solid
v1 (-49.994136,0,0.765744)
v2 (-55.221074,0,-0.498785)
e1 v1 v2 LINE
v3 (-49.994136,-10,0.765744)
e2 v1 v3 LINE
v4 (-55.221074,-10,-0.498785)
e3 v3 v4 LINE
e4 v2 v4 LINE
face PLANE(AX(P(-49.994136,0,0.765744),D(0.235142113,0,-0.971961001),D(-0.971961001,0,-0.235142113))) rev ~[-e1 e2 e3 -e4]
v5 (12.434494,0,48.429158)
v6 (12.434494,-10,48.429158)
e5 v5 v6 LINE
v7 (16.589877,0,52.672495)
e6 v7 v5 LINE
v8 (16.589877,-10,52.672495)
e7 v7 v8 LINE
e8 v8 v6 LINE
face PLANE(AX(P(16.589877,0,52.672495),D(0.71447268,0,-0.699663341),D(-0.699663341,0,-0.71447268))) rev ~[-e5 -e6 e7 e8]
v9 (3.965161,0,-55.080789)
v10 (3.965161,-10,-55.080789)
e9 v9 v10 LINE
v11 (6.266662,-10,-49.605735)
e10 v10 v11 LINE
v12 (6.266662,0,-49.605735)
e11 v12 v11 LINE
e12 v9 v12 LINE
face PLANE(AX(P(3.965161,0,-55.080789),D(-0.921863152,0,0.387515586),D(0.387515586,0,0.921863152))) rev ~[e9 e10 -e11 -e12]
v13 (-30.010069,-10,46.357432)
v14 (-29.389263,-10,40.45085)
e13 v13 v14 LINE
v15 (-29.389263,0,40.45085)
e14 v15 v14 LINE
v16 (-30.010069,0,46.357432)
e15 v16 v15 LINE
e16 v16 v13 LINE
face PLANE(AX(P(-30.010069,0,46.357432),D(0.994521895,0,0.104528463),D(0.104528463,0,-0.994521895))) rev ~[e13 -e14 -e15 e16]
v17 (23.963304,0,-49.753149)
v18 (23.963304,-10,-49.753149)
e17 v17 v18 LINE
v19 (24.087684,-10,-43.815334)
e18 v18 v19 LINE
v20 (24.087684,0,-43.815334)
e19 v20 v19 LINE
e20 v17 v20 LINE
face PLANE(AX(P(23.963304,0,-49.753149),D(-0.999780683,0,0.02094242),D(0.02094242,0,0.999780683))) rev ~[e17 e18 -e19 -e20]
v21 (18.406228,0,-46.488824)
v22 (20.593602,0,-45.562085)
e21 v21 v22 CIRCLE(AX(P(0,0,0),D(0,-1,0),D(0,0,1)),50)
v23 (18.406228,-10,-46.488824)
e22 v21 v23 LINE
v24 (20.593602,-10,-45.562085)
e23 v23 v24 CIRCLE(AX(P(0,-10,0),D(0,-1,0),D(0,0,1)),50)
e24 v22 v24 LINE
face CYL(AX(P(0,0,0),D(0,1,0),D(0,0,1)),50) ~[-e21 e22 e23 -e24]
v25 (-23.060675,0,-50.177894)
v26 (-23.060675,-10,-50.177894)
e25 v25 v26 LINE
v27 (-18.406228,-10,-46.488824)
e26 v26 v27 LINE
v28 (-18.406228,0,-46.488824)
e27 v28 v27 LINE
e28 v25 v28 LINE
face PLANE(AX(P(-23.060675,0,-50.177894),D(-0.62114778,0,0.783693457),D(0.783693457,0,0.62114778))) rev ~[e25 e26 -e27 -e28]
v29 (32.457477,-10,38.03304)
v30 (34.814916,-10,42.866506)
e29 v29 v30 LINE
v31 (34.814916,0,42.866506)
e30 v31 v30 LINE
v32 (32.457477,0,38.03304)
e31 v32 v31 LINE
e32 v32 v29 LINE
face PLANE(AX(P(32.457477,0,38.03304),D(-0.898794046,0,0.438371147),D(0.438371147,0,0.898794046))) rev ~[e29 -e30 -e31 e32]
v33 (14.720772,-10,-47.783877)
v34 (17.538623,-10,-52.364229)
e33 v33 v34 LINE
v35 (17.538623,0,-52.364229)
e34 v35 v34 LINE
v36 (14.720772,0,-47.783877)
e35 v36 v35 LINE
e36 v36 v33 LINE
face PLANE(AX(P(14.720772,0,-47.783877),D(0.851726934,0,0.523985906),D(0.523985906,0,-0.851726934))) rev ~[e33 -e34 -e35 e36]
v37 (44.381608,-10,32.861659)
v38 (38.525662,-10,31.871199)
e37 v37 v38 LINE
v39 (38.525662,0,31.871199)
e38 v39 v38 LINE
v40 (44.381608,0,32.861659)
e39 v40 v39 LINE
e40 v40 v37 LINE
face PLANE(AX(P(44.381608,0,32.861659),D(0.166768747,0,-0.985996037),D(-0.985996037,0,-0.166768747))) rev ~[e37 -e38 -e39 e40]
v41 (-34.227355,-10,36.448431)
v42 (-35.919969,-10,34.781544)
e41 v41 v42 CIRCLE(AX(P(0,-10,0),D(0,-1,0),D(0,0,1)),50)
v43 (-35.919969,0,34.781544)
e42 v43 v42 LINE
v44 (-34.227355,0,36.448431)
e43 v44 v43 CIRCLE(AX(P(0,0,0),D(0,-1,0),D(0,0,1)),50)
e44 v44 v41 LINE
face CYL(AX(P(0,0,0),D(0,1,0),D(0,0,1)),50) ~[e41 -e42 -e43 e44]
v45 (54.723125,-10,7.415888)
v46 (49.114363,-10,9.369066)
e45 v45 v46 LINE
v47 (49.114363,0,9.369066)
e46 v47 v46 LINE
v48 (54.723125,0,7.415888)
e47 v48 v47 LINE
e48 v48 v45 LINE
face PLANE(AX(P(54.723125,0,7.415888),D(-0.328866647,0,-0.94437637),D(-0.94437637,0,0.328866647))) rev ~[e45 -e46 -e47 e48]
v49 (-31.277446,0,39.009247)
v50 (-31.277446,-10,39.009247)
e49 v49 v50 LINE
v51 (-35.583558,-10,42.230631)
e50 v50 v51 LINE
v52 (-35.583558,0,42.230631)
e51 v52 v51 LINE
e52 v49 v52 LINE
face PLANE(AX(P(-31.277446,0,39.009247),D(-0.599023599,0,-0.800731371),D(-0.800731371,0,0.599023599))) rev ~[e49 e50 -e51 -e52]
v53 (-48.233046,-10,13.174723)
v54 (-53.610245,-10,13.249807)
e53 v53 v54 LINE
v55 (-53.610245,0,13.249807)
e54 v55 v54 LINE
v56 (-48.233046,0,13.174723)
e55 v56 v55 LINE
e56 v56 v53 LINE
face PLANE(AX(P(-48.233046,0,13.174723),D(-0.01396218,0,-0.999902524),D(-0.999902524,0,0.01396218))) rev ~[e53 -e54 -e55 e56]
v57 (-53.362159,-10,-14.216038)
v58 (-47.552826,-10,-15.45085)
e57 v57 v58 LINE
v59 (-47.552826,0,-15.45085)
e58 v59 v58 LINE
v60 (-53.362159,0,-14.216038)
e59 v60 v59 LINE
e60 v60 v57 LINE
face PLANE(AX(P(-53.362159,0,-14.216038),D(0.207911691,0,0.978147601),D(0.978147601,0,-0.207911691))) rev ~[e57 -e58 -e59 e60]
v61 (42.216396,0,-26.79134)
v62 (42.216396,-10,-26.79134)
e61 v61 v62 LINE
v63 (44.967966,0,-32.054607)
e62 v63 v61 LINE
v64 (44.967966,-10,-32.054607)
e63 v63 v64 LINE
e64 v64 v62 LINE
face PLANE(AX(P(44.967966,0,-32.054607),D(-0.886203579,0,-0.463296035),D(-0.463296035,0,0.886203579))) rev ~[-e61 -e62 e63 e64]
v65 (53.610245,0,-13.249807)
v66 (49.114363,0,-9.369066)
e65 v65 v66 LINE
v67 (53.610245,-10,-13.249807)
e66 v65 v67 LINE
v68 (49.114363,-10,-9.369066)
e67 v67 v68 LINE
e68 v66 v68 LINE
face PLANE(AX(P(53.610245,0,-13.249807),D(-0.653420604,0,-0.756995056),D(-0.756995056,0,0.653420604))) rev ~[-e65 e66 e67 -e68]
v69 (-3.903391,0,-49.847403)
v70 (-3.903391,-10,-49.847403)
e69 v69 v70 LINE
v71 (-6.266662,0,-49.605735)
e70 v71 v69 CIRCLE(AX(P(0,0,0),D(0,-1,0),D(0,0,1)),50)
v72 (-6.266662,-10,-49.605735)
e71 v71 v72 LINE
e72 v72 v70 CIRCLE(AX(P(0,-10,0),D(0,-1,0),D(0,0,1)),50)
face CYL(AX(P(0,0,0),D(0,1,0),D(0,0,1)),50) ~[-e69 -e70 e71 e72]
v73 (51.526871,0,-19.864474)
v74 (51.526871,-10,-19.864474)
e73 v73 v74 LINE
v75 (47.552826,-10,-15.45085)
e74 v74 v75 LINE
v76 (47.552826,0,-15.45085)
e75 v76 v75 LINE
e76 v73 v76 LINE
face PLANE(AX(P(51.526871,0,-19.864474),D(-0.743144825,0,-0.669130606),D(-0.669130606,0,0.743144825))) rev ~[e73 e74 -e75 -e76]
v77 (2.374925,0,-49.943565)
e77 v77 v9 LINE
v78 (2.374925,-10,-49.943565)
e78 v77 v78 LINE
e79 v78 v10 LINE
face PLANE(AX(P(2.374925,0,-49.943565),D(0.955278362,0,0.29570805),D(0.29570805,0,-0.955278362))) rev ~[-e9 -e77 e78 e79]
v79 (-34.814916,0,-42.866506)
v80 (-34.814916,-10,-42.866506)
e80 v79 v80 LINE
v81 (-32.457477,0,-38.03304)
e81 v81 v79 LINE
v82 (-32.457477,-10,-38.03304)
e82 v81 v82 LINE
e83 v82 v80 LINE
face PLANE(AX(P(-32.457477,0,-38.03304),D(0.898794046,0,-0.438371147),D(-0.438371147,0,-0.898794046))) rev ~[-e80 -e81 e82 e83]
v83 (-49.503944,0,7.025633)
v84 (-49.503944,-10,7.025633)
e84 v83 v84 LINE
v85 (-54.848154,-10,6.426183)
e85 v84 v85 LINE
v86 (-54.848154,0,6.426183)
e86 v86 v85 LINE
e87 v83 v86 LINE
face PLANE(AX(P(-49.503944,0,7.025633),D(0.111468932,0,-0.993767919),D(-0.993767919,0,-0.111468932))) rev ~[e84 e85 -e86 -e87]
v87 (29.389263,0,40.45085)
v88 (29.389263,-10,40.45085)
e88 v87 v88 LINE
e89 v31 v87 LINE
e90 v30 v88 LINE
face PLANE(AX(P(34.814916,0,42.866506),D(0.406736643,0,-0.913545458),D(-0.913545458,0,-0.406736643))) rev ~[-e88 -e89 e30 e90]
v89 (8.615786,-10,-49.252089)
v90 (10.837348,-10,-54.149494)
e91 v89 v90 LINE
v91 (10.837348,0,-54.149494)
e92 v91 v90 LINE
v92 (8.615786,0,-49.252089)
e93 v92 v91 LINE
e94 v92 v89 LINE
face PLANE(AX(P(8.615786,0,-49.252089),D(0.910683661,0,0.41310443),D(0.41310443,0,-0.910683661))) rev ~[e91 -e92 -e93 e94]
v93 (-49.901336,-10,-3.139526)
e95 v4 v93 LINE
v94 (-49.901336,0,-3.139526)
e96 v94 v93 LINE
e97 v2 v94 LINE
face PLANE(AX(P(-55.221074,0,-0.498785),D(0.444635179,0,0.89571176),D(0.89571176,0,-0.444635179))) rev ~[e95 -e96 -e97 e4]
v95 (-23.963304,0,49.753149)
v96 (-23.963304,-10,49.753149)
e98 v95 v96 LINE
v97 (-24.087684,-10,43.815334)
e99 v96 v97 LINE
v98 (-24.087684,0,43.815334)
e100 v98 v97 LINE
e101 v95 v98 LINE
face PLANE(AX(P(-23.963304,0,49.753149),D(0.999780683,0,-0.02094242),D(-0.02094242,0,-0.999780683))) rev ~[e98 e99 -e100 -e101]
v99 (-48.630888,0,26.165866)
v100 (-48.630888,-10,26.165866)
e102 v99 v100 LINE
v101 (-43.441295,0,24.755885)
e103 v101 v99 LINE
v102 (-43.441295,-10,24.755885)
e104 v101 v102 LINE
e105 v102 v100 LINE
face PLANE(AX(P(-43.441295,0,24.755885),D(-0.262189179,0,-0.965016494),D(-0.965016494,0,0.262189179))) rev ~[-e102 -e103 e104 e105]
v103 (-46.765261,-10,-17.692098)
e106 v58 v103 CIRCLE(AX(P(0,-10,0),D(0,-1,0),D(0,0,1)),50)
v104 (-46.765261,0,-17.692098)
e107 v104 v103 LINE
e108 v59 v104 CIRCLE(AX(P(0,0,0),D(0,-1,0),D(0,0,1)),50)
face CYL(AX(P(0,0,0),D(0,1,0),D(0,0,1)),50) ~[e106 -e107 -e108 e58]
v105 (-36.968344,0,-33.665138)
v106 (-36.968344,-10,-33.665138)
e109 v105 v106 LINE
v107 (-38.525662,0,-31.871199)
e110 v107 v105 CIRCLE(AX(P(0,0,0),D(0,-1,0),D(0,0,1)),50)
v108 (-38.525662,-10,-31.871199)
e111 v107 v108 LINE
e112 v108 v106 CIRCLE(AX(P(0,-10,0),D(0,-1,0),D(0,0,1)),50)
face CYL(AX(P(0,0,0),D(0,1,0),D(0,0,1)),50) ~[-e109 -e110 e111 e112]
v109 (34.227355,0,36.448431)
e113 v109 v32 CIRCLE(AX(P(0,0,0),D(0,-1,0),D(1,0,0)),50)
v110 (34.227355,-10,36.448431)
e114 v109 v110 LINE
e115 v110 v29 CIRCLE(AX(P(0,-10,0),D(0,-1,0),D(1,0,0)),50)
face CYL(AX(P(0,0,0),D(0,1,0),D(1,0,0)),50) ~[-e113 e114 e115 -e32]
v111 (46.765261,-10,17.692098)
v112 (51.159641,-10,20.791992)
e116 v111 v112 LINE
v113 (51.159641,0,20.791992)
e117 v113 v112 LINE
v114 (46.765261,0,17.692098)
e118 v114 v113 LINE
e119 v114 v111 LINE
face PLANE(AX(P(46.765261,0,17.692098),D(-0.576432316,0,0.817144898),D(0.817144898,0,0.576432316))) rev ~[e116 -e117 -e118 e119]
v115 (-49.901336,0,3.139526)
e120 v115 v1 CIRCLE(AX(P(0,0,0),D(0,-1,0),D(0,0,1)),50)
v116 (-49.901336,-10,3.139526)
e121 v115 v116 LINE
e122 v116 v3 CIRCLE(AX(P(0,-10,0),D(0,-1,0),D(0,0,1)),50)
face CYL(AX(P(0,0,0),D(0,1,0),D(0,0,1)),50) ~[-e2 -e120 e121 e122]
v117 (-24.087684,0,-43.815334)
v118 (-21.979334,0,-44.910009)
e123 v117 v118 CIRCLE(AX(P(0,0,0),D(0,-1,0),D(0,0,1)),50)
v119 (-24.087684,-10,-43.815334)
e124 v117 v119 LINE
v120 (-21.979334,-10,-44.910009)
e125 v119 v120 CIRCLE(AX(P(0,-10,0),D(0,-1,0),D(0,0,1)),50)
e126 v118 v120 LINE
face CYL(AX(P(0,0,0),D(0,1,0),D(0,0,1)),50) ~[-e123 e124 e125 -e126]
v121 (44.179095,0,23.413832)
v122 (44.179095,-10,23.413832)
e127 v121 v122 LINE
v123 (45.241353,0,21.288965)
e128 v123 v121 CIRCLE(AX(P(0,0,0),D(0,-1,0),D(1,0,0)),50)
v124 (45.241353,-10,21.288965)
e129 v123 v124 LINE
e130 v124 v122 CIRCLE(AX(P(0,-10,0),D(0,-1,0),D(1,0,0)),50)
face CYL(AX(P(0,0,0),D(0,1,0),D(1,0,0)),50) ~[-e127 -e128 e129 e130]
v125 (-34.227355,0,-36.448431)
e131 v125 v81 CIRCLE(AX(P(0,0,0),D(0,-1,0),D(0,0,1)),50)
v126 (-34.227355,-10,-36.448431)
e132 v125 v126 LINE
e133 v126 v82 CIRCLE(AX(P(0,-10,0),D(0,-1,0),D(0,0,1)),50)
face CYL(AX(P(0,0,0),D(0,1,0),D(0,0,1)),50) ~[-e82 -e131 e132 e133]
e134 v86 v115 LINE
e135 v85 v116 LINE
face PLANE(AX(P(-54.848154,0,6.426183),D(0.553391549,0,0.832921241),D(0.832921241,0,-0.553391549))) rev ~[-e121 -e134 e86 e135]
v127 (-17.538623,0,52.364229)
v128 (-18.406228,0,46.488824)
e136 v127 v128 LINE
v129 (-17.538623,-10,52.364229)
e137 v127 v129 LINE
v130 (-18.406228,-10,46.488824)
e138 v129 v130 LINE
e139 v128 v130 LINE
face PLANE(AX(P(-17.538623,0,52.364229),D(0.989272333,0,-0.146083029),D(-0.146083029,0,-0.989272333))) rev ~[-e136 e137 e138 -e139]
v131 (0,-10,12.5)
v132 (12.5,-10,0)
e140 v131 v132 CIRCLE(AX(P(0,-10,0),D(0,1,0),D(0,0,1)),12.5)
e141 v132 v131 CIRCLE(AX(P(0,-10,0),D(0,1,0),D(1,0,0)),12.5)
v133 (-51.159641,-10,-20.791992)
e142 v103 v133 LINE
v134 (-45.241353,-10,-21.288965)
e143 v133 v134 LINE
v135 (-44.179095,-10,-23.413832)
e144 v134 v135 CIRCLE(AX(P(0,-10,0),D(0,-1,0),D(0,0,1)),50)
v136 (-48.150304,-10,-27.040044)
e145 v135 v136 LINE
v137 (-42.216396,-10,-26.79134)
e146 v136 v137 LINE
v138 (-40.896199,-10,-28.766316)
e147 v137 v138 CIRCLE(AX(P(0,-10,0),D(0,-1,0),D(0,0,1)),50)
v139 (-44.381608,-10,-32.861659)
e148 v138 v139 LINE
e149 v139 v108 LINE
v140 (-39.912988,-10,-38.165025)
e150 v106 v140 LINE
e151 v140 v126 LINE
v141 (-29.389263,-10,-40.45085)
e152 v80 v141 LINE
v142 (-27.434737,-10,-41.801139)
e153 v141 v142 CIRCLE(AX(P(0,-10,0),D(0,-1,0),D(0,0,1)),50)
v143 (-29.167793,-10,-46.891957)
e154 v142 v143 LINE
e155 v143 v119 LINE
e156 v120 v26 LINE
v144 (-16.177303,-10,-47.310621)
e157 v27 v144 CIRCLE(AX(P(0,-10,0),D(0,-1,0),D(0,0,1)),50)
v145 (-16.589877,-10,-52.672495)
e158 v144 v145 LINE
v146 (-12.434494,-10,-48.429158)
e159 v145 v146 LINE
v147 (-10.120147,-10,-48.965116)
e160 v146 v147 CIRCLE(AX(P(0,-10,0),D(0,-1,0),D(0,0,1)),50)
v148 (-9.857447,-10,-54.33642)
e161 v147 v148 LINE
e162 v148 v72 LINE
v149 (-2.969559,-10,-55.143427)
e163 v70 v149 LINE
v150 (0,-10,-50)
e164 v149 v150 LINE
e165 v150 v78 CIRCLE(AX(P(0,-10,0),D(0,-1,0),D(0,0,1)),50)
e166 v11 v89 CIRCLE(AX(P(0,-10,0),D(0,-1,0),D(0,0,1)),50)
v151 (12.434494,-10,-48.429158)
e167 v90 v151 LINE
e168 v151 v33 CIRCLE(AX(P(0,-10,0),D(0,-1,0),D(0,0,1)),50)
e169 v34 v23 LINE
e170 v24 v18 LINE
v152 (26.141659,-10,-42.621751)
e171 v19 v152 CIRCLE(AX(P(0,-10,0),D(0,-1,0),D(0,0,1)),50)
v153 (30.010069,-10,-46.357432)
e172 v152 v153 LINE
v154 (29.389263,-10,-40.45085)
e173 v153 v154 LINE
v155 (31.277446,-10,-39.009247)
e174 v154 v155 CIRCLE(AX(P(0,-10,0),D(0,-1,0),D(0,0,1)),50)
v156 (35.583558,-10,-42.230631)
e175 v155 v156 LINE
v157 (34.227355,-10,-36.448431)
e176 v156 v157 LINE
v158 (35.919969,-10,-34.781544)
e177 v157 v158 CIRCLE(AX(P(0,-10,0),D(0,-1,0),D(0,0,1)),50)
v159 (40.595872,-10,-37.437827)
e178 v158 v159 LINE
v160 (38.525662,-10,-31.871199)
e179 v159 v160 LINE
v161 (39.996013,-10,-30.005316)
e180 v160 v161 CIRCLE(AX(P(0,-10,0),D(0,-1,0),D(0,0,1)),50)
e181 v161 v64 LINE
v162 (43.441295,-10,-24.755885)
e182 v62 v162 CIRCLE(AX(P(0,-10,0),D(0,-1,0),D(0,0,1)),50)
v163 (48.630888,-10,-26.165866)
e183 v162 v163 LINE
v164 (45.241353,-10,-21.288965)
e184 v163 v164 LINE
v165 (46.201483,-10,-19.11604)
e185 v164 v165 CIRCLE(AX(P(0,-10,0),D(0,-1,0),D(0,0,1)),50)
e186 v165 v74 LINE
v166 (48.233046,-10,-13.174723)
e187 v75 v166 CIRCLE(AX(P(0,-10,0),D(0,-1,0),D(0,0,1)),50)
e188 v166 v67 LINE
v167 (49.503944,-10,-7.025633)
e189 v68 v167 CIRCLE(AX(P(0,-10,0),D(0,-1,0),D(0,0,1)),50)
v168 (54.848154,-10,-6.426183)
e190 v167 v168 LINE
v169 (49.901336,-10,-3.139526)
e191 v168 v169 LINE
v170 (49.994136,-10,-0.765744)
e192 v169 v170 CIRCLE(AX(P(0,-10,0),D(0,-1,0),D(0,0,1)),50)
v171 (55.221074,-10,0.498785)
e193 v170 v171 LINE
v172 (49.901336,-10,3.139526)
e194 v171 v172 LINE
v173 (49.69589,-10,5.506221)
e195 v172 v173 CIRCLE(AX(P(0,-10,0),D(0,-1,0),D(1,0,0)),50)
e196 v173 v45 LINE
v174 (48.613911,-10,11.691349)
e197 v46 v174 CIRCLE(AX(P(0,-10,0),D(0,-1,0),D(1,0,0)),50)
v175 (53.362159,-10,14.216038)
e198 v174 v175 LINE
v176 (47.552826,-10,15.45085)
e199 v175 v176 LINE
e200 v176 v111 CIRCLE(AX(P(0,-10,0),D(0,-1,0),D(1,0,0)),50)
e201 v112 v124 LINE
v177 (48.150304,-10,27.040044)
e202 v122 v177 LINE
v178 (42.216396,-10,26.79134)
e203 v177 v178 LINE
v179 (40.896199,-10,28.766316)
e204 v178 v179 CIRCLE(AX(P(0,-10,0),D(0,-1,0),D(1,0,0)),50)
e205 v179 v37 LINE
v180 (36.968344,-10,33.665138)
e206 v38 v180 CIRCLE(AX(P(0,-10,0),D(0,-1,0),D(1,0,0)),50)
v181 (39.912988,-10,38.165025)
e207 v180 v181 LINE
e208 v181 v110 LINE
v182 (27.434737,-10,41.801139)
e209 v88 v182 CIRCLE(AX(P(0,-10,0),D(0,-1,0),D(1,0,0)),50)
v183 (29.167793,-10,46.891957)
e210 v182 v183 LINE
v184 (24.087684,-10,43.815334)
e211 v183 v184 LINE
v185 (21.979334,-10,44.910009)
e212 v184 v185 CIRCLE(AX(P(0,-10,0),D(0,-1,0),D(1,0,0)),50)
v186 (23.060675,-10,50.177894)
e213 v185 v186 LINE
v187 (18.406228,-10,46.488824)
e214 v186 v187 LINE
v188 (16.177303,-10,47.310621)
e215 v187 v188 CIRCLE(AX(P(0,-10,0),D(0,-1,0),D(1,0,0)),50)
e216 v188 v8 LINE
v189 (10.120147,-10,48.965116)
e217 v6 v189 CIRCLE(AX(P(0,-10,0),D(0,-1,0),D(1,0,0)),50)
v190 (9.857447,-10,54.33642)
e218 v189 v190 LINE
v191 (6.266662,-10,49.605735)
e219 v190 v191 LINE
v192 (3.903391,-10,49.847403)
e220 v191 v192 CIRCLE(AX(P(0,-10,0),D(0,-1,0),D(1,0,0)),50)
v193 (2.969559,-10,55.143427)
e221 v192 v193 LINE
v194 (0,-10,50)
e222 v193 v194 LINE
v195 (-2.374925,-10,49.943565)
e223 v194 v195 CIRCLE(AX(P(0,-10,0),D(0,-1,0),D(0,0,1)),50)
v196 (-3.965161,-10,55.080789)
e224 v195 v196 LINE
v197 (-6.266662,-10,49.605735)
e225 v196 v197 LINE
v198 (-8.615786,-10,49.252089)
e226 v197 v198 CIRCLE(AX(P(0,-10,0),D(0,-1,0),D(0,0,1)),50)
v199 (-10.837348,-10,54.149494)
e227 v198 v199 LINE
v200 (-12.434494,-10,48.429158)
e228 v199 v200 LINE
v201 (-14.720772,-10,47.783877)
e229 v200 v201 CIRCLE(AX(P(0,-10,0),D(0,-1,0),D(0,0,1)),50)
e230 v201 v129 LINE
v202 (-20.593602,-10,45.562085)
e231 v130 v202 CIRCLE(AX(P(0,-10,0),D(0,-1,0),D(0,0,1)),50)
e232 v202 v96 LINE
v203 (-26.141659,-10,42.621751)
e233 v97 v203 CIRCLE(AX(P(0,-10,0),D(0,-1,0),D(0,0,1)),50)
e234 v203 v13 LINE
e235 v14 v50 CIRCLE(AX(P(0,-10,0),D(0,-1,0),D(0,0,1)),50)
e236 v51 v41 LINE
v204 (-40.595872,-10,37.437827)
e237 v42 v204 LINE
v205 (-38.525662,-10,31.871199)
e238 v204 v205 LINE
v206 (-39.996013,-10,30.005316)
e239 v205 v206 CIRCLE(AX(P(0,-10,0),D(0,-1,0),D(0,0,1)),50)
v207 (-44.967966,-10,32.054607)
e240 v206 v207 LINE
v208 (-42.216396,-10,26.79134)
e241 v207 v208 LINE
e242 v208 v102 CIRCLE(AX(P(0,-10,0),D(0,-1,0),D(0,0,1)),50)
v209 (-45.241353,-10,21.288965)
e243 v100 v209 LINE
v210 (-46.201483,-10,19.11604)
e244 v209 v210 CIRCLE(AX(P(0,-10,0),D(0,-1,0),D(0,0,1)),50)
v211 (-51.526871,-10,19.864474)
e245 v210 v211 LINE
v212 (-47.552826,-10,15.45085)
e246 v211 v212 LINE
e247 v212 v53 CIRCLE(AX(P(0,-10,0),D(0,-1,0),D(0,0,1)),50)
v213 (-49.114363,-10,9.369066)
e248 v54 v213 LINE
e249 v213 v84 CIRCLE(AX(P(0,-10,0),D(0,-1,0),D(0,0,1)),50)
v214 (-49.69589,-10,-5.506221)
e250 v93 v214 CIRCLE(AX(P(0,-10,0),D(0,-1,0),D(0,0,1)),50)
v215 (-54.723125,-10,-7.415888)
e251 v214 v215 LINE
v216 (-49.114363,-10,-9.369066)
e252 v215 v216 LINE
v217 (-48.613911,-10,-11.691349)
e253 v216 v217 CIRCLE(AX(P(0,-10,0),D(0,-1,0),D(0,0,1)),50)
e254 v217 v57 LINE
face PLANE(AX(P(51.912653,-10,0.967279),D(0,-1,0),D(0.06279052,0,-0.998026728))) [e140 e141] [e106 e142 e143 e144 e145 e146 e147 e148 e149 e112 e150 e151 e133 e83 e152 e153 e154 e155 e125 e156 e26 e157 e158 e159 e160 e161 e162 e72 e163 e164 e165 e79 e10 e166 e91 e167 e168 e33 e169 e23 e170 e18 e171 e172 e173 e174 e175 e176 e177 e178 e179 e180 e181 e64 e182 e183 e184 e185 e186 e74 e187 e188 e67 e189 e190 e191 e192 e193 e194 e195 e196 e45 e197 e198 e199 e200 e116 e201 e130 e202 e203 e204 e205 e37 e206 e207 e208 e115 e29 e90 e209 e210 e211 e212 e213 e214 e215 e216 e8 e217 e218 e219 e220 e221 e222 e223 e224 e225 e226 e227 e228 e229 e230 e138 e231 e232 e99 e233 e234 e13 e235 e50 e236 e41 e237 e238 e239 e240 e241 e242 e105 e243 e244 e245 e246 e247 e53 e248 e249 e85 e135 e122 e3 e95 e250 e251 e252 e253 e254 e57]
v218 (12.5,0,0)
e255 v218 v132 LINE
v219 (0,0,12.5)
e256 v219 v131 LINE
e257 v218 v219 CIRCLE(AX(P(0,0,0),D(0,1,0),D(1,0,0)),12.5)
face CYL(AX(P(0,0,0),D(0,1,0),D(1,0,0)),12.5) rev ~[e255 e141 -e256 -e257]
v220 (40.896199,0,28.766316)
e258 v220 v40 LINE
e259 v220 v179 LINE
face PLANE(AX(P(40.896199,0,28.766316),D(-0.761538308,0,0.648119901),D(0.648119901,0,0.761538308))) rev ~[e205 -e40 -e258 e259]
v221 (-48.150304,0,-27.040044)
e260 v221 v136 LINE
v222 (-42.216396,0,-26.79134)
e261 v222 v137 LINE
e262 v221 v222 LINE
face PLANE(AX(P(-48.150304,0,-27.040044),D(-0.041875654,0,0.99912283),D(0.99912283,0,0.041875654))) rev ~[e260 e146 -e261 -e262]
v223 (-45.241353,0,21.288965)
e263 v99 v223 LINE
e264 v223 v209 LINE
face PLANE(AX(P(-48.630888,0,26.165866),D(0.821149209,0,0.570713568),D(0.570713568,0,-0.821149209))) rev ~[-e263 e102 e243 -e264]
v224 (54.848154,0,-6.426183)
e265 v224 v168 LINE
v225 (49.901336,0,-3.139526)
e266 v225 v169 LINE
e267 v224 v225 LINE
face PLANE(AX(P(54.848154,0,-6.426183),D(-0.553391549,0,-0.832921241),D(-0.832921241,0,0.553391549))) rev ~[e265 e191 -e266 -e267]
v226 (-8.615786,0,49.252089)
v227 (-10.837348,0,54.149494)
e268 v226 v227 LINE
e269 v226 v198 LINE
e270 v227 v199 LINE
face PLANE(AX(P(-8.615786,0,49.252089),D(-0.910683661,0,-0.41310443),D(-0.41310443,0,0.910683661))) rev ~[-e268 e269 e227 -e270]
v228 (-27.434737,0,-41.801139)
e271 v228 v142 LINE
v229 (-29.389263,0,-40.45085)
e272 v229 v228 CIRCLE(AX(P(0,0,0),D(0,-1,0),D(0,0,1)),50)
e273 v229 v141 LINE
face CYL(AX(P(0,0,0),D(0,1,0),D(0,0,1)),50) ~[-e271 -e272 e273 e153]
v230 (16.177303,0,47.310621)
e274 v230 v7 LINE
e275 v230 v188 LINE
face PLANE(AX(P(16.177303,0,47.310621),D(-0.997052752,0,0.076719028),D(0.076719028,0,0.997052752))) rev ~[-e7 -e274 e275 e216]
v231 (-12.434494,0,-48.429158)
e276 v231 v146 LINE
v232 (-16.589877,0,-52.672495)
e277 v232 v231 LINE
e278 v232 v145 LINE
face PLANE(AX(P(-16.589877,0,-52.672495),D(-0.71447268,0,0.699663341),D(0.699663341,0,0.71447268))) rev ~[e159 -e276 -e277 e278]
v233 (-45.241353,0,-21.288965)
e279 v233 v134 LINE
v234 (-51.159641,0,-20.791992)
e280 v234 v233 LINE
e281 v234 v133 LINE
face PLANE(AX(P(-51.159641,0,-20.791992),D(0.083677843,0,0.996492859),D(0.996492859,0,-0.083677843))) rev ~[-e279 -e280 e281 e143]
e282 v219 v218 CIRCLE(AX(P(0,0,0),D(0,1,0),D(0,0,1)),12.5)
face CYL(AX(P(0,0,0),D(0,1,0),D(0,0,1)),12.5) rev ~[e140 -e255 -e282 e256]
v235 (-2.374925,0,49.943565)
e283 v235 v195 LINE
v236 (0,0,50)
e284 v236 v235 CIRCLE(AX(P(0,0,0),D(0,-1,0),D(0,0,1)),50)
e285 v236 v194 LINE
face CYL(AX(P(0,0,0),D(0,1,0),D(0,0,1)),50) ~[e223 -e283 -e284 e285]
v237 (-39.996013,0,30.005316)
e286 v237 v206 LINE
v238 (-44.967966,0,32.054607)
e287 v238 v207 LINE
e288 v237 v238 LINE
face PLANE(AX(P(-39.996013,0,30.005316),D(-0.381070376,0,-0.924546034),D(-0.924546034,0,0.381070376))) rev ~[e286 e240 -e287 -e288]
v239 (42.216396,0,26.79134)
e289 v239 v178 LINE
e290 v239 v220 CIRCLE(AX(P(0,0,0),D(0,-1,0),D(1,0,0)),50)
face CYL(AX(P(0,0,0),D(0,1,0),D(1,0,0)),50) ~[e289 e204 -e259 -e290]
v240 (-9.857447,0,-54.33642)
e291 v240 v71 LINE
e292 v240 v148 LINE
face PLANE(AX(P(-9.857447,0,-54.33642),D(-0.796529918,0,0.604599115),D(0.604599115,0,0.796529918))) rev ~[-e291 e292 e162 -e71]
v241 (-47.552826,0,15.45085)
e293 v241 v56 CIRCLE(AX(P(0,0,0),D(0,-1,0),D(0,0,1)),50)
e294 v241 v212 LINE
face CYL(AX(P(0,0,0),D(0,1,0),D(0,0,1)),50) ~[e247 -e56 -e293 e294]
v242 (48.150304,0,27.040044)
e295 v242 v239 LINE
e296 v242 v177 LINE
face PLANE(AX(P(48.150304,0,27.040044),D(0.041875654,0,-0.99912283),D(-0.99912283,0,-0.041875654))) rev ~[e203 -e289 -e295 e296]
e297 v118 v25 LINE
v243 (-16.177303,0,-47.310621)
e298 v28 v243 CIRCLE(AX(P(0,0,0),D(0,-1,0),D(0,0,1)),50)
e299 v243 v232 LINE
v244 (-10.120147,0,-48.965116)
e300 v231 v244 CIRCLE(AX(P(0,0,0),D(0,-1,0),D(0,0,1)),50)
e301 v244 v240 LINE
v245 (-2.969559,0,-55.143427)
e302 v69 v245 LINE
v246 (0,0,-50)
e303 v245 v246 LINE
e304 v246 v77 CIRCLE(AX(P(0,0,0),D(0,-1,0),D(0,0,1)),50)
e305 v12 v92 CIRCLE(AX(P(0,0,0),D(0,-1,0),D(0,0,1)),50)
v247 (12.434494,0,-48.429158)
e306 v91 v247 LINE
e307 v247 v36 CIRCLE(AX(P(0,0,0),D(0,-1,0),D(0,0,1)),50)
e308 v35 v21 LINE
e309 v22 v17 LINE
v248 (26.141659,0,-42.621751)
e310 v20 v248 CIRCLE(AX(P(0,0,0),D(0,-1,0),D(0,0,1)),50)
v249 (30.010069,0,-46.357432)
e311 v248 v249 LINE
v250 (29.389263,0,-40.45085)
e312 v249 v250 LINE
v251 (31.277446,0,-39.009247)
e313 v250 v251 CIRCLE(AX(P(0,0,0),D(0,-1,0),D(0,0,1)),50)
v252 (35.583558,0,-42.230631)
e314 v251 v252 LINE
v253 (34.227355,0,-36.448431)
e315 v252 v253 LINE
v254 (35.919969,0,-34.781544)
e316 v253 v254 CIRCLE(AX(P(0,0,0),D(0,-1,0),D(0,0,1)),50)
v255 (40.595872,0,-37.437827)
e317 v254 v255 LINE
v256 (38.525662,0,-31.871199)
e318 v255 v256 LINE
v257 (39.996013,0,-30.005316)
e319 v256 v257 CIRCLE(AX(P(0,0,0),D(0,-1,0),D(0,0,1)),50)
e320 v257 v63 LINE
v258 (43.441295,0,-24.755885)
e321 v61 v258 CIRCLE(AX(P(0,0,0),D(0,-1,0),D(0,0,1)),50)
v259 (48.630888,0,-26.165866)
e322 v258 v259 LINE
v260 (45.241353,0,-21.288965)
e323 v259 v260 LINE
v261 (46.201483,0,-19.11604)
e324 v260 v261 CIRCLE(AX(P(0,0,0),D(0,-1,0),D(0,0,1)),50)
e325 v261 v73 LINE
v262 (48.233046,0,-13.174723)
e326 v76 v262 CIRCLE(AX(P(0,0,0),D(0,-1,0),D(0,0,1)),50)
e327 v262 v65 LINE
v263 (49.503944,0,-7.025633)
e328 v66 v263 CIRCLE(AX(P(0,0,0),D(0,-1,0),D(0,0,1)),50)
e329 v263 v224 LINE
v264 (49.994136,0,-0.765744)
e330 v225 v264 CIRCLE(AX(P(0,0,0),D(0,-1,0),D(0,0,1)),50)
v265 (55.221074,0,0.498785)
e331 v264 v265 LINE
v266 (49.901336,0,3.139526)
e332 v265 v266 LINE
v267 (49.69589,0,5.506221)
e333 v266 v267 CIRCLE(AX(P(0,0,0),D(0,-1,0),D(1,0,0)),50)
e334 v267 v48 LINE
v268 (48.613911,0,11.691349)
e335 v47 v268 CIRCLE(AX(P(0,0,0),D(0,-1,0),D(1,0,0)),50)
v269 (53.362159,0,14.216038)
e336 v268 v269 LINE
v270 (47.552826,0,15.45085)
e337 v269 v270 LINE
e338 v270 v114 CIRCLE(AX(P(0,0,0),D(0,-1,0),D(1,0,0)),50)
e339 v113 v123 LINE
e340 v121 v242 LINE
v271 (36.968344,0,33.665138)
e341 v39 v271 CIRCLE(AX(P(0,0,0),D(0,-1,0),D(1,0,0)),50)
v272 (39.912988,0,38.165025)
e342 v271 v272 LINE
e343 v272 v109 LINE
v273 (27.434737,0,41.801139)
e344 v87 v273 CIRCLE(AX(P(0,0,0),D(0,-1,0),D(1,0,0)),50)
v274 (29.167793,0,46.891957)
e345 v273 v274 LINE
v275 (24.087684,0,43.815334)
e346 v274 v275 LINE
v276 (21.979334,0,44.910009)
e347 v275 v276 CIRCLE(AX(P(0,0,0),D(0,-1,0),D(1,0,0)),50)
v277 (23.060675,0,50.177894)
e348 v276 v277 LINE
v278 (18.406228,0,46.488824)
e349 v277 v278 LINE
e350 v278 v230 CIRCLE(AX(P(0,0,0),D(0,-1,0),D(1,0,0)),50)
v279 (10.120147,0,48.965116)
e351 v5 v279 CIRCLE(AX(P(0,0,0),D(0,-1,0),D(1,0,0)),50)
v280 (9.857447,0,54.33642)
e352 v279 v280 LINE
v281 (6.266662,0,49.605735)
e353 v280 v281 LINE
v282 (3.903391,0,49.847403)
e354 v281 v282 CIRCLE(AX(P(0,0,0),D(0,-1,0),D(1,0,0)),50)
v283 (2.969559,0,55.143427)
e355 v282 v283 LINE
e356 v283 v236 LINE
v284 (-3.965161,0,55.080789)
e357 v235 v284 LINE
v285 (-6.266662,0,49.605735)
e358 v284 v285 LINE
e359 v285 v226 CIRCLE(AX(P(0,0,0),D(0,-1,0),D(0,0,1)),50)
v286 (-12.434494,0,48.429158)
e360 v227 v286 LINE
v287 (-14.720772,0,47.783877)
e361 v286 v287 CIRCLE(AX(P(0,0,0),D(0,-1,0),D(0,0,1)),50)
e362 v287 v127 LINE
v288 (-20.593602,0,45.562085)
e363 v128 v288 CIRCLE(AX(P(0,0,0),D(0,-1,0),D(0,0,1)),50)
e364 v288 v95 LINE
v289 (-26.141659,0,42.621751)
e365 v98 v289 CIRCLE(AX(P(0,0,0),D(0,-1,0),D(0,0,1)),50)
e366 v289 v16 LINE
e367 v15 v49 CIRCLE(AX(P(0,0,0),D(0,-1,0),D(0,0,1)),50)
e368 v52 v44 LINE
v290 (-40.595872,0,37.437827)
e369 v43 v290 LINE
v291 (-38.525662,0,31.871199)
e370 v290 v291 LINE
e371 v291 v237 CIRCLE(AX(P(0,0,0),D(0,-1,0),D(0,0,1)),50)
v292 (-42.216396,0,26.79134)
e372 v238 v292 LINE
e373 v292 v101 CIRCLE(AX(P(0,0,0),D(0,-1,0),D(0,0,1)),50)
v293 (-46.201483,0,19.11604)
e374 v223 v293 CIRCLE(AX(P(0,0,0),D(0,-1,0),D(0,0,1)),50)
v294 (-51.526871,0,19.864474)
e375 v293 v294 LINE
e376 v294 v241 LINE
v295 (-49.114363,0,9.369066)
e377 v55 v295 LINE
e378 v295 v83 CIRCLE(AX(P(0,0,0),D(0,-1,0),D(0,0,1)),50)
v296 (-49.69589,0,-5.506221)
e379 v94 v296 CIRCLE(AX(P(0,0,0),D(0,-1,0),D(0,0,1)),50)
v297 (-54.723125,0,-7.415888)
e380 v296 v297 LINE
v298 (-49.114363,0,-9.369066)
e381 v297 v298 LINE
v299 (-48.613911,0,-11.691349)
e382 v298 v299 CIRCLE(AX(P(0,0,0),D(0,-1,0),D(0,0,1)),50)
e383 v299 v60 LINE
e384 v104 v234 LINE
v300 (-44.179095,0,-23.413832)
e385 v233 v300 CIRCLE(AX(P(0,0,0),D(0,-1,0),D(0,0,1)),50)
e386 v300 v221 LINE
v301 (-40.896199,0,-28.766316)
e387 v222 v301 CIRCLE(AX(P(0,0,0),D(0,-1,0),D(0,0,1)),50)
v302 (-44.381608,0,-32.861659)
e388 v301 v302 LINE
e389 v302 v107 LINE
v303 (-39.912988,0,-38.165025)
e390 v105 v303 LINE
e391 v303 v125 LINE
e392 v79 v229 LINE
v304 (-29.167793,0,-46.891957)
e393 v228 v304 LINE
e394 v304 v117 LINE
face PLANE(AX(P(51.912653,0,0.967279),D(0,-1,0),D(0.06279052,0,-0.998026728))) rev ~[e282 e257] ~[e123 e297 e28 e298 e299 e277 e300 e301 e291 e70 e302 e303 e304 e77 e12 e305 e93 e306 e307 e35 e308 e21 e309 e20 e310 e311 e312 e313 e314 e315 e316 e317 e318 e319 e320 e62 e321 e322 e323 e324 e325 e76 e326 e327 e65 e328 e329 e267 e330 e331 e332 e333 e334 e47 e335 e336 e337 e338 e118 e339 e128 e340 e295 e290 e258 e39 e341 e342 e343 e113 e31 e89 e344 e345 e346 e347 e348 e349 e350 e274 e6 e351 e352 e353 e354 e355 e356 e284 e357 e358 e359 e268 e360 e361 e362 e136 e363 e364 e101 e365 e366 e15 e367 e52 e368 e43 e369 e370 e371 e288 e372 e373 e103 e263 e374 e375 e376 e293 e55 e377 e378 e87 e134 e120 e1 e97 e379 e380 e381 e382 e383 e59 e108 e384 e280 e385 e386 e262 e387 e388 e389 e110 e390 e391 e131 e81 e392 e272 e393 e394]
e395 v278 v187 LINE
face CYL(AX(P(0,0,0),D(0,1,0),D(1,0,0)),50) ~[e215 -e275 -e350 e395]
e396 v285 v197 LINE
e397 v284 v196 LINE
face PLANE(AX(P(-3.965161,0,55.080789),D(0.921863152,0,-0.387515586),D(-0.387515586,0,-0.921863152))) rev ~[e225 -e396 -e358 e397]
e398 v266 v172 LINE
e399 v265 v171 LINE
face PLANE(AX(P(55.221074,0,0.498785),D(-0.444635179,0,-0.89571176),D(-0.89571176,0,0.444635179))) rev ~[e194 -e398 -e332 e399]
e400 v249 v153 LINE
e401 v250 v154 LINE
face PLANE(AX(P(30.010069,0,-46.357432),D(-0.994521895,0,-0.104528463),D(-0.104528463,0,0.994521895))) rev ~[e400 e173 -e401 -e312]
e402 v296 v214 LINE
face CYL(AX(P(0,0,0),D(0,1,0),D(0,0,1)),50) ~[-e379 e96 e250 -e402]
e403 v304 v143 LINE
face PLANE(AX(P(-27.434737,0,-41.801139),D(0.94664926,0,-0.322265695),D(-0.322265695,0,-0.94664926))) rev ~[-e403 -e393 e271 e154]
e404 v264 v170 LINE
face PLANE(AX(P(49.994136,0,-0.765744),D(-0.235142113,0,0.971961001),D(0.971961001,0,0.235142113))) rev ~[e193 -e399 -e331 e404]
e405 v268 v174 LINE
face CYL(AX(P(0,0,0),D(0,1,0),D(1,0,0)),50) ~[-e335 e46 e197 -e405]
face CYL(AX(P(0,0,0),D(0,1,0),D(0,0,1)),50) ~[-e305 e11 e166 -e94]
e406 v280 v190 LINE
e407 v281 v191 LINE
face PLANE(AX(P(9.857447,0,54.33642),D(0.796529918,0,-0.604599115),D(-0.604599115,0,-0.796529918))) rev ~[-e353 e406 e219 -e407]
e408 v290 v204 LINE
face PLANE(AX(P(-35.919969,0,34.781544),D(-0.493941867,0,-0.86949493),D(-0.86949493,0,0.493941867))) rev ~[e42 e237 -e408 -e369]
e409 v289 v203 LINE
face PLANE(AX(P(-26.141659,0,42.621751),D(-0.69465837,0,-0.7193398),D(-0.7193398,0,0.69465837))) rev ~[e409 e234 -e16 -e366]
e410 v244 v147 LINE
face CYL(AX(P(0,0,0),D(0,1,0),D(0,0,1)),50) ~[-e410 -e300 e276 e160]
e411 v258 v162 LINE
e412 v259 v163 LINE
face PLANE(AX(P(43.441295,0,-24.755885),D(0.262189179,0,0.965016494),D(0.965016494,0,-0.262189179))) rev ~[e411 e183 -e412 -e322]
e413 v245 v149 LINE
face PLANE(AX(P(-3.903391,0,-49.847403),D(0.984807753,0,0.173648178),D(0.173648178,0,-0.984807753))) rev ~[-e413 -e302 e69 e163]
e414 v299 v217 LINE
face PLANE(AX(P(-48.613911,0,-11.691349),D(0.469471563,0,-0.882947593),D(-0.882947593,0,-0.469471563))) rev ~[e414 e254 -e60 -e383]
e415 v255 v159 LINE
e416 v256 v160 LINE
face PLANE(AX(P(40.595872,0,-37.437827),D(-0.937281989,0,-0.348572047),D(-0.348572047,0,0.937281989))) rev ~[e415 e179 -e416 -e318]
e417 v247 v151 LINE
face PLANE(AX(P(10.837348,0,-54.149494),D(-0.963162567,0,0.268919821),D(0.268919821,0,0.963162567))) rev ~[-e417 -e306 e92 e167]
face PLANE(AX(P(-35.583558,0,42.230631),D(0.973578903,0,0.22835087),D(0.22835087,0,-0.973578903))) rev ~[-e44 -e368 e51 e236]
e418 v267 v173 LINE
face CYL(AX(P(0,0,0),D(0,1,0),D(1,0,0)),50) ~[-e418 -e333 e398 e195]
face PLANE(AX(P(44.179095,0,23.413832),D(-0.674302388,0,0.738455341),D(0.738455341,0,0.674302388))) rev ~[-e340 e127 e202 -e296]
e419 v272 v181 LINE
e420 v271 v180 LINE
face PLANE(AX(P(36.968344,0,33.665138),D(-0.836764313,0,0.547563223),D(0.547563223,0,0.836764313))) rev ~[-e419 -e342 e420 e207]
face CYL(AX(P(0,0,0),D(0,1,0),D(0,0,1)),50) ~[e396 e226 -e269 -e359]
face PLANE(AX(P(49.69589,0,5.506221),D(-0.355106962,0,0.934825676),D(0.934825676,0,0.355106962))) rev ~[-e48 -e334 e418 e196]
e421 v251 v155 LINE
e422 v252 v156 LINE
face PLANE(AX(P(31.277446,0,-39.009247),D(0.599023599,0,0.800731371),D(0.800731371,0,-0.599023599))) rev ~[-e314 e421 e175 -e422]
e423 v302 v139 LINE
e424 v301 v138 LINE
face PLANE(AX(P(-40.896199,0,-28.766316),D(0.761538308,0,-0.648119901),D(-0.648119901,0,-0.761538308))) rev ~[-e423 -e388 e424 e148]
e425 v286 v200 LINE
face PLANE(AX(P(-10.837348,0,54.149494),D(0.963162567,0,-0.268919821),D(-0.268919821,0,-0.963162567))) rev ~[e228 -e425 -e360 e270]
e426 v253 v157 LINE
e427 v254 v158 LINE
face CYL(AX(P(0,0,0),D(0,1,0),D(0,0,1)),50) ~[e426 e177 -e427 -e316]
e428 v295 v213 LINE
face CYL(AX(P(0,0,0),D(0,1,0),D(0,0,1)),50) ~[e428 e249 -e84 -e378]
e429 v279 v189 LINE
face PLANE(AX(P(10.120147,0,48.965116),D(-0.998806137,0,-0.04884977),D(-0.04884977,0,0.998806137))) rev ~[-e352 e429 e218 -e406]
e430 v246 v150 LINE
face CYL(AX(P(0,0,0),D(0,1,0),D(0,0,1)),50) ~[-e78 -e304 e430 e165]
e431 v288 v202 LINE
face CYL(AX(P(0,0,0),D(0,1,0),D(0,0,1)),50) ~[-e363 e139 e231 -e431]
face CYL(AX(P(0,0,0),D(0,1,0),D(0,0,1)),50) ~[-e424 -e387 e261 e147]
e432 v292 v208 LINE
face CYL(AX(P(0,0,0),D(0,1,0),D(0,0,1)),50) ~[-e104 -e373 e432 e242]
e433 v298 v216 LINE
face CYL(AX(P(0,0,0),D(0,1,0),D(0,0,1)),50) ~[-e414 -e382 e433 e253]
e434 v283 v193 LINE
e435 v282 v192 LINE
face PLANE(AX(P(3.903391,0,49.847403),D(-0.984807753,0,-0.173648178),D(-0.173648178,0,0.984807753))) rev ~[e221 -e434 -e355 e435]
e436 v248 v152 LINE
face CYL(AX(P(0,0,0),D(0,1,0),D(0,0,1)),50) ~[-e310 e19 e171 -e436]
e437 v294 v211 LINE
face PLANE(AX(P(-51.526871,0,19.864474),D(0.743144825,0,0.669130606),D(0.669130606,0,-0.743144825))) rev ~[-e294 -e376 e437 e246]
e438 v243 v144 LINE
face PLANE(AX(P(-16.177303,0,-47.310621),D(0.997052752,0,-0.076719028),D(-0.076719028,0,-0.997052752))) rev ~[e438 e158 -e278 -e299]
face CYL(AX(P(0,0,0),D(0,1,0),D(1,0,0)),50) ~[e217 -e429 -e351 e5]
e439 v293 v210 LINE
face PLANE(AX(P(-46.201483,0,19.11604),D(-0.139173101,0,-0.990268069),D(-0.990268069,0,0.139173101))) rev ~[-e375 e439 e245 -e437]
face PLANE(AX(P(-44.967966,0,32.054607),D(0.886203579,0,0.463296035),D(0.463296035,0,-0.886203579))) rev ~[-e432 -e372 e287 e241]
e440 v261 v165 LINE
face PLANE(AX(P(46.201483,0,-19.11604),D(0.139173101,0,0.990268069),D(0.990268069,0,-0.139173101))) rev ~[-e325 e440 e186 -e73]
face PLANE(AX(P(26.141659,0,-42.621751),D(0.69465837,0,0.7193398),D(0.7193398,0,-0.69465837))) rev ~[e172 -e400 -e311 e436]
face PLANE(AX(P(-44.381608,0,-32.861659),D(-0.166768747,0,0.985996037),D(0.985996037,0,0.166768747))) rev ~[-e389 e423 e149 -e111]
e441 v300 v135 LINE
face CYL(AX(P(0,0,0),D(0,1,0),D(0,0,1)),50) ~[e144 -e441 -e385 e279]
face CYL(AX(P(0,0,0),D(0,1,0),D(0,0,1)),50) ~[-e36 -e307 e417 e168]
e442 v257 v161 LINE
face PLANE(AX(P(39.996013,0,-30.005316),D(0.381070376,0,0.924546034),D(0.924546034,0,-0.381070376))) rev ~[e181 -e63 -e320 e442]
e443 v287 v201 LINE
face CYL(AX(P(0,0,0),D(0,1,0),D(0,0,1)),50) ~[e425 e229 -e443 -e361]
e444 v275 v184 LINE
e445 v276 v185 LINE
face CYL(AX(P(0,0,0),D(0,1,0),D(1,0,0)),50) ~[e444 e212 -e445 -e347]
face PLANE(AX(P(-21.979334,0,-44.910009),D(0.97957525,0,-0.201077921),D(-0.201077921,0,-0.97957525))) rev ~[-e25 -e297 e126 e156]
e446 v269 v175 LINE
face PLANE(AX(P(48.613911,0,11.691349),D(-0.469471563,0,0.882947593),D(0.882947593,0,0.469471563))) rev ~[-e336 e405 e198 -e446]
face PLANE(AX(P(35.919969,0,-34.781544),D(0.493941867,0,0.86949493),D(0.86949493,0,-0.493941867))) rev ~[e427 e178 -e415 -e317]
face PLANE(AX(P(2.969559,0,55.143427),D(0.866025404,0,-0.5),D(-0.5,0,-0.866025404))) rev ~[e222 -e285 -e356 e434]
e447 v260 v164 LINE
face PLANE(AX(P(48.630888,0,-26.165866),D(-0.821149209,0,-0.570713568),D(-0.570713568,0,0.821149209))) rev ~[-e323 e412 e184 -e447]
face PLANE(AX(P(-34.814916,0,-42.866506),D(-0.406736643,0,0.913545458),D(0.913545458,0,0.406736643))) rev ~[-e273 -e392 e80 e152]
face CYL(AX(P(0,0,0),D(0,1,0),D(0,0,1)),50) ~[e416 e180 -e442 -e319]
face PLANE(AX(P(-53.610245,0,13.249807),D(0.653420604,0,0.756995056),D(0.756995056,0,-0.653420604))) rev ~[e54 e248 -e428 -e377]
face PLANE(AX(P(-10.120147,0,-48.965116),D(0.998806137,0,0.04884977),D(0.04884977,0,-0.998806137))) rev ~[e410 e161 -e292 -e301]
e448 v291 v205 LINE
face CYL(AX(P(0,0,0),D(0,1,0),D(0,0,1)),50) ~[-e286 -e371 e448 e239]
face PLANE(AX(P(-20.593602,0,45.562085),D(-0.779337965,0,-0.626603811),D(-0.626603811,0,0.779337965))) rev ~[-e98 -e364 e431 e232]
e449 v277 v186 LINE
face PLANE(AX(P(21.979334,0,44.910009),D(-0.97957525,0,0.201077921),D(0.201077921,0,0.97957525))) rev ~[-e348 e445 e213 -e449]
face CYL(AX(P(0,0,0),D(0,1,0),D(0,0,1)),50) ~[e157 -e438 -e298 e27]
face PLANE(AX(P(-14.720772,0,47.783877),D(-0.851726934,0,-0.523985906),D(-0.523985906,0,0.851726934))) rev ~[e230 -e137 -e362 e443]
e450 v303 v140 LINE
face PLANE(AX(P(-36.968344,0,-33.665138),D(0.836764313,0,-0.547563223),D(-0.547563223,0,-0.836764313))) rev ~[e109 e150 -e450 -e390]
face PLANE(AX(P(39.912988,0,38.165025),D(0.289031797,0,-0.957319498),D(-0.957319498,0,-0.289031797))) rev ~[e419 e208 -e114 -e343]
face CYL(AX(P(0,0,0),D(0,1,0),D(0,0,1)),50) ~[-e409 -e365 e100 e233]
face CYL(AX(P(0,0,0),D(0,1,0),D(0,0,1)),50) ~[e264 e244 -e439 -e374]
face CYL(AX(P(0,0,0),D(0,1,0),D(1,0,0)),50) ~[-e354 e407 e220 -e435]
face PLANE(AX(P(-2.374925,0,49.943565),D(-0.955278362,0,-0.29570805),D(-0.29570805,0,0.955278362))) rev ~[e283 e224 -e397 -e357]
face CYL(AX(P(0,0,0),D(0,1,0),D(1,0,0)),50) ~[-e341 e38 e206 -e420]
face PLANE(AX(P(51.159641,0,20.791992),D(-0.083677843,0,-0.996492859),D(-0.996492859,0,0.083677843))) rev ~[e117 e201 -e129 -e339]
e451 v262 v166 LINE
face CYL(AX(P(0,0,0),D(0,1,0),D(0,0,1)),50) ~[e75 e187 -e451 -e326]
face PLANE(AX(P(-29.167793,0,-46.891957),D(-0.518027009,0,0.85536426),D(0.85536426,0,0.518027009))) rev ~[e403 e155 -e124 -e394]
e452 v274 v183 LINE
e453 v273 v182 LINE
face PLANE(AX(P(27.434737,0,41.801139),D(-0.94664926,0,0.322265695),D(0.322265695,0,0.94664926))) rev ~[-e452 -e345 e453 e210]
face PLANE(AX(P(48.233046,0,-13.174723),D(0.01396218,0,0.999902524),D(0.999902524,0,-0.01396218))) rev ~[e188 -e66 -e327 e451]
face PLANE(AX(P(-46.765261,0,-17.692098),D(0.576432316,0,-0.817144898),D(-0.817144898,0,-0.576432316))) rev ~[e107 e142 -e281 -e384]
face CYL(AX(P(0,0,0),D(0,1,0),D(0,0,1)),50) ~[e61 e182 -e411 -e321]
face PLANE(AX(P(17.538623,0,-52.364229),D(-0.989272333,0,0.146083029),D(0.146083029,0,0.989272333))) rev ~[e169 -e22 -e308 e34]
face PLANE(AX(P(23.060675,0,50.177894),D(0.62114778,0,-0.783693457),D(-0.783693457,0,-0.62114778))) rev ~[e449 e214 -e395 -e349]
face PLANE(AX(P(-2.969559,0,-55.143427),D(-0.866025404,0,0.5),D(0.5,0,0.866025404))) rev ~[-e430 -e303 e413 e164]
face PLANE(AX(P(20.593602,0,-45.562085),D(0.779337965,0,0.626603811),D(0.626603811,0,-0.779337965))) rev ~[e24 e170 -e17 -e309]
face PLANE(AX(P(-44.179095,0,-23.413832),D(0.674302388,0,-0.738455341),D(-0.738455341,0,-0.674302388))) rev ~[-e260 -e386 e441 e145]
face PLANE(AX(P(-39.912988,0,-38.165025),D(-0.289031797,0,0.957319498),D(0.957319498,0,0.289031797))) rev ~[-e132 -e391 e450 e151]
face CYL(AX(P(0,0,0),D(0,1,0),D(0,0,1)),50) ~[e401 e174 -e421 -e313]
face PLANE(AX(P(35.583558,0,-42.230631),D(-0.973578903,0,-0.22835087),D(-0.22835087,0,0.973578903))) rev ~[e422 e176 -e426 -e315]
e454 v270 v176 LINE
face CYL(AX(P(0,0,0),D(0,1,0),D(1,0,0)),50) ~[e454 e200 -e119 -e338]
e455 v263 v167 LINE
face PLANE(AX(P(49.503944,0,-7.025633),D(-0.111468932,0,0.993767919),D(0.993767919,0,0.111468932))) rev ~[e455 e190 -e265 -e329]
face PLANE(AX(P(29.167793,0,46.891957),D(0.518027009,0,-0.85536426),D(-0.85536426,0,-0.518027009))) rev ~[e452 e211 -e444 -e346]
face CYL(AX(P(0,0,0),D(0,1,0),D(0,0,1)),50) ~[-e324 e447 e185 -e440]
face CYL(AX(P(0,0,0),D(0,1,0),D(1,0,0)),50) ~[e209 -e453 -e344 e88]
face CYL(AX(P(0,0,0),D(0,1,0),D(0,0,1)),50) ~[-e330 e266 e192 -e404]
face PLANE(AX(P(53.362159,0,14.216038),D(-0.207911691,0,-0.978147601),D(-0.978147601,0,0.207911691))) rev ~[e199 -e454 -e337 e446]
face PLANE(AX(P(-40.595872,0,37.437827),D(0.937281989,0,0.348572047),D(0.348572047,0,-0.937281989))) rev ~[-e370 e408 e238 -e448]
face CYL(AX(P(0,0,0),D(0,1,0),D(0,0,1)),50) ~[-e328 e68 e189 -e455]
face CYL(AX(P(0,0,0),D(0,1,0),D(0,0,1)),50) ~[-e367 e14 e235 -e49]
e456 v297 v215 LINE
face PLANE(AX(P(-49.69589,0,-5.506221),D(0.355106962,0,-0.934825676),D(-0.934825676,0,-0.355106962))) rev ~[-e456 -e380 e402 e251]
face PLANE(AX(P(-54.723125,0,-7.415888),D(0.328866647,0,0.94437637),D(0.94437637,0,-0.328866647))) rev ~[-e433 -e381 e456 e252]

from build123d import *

# Parameters (mm, degrees)
F1_DEPTH        = 10
F2_DEPTH        = 10
F2_COPIES_COUNT = 50


# Not quite as in the source:
# - a pattern or mirror of a feature is missing from the dataset's text; its kind, count and spacing are read off the source's solid


with BuildPart() as f1:
    # F0 (on Front) → F1 (new body)
    with BuildSketch(Plane.XZ):
        with BuildLine():
            ThreePointArc((0, 50), (-35.3553390593, -35.3553390593), (50, 0))
            ThreePointArc((50, 0), (36.7094642634, 33.947241913), (3.9033906601, 49.8474025537))
            ThreePointArc((3.9033906601, 49.8474025537), (1.9531861551, 49.9618360736), (0, 50))
        make_face()
        with BuildLine():
            ThreePointArc((12.5, 0), (-8.8388347648, -8.8388347648), (0, 12.5))
            ThreePointArc((0, 12.5), (8.8388347648, 8.8388347648), (12.5, 0))
        make_face(mode=Mode.SUBTRACT)
    extrude(amount=F1_DEPTH)

    # F0 (on Front) → F2 (join)
    with BuildSketch(Plane.XZ):
        with BuildLine():
            ThreePointArc((0, 50), (1.9531861551, 49.9618360736), (3.9033906601, 49.8474025537))
            Line((3.9033906601, 49.8474025537), (2.9695587307, 55.1434265976))
            Line((2.9695587307, 55.1434265976), (0, 50))
        make_face()
    f2 = extrude(amount=F2_DEPTH)

    # F2_copies: F2 ×50 about axis
    f2_copies_axis = Axis((0, 0, 0), (0, 1, 0))
    for i in range(1, F2_COPIES_COUNT):
        add(f2.rotate(f2_copies_axis, i * 360 / F2_COPIES_COUNT))


solid = f1.part
